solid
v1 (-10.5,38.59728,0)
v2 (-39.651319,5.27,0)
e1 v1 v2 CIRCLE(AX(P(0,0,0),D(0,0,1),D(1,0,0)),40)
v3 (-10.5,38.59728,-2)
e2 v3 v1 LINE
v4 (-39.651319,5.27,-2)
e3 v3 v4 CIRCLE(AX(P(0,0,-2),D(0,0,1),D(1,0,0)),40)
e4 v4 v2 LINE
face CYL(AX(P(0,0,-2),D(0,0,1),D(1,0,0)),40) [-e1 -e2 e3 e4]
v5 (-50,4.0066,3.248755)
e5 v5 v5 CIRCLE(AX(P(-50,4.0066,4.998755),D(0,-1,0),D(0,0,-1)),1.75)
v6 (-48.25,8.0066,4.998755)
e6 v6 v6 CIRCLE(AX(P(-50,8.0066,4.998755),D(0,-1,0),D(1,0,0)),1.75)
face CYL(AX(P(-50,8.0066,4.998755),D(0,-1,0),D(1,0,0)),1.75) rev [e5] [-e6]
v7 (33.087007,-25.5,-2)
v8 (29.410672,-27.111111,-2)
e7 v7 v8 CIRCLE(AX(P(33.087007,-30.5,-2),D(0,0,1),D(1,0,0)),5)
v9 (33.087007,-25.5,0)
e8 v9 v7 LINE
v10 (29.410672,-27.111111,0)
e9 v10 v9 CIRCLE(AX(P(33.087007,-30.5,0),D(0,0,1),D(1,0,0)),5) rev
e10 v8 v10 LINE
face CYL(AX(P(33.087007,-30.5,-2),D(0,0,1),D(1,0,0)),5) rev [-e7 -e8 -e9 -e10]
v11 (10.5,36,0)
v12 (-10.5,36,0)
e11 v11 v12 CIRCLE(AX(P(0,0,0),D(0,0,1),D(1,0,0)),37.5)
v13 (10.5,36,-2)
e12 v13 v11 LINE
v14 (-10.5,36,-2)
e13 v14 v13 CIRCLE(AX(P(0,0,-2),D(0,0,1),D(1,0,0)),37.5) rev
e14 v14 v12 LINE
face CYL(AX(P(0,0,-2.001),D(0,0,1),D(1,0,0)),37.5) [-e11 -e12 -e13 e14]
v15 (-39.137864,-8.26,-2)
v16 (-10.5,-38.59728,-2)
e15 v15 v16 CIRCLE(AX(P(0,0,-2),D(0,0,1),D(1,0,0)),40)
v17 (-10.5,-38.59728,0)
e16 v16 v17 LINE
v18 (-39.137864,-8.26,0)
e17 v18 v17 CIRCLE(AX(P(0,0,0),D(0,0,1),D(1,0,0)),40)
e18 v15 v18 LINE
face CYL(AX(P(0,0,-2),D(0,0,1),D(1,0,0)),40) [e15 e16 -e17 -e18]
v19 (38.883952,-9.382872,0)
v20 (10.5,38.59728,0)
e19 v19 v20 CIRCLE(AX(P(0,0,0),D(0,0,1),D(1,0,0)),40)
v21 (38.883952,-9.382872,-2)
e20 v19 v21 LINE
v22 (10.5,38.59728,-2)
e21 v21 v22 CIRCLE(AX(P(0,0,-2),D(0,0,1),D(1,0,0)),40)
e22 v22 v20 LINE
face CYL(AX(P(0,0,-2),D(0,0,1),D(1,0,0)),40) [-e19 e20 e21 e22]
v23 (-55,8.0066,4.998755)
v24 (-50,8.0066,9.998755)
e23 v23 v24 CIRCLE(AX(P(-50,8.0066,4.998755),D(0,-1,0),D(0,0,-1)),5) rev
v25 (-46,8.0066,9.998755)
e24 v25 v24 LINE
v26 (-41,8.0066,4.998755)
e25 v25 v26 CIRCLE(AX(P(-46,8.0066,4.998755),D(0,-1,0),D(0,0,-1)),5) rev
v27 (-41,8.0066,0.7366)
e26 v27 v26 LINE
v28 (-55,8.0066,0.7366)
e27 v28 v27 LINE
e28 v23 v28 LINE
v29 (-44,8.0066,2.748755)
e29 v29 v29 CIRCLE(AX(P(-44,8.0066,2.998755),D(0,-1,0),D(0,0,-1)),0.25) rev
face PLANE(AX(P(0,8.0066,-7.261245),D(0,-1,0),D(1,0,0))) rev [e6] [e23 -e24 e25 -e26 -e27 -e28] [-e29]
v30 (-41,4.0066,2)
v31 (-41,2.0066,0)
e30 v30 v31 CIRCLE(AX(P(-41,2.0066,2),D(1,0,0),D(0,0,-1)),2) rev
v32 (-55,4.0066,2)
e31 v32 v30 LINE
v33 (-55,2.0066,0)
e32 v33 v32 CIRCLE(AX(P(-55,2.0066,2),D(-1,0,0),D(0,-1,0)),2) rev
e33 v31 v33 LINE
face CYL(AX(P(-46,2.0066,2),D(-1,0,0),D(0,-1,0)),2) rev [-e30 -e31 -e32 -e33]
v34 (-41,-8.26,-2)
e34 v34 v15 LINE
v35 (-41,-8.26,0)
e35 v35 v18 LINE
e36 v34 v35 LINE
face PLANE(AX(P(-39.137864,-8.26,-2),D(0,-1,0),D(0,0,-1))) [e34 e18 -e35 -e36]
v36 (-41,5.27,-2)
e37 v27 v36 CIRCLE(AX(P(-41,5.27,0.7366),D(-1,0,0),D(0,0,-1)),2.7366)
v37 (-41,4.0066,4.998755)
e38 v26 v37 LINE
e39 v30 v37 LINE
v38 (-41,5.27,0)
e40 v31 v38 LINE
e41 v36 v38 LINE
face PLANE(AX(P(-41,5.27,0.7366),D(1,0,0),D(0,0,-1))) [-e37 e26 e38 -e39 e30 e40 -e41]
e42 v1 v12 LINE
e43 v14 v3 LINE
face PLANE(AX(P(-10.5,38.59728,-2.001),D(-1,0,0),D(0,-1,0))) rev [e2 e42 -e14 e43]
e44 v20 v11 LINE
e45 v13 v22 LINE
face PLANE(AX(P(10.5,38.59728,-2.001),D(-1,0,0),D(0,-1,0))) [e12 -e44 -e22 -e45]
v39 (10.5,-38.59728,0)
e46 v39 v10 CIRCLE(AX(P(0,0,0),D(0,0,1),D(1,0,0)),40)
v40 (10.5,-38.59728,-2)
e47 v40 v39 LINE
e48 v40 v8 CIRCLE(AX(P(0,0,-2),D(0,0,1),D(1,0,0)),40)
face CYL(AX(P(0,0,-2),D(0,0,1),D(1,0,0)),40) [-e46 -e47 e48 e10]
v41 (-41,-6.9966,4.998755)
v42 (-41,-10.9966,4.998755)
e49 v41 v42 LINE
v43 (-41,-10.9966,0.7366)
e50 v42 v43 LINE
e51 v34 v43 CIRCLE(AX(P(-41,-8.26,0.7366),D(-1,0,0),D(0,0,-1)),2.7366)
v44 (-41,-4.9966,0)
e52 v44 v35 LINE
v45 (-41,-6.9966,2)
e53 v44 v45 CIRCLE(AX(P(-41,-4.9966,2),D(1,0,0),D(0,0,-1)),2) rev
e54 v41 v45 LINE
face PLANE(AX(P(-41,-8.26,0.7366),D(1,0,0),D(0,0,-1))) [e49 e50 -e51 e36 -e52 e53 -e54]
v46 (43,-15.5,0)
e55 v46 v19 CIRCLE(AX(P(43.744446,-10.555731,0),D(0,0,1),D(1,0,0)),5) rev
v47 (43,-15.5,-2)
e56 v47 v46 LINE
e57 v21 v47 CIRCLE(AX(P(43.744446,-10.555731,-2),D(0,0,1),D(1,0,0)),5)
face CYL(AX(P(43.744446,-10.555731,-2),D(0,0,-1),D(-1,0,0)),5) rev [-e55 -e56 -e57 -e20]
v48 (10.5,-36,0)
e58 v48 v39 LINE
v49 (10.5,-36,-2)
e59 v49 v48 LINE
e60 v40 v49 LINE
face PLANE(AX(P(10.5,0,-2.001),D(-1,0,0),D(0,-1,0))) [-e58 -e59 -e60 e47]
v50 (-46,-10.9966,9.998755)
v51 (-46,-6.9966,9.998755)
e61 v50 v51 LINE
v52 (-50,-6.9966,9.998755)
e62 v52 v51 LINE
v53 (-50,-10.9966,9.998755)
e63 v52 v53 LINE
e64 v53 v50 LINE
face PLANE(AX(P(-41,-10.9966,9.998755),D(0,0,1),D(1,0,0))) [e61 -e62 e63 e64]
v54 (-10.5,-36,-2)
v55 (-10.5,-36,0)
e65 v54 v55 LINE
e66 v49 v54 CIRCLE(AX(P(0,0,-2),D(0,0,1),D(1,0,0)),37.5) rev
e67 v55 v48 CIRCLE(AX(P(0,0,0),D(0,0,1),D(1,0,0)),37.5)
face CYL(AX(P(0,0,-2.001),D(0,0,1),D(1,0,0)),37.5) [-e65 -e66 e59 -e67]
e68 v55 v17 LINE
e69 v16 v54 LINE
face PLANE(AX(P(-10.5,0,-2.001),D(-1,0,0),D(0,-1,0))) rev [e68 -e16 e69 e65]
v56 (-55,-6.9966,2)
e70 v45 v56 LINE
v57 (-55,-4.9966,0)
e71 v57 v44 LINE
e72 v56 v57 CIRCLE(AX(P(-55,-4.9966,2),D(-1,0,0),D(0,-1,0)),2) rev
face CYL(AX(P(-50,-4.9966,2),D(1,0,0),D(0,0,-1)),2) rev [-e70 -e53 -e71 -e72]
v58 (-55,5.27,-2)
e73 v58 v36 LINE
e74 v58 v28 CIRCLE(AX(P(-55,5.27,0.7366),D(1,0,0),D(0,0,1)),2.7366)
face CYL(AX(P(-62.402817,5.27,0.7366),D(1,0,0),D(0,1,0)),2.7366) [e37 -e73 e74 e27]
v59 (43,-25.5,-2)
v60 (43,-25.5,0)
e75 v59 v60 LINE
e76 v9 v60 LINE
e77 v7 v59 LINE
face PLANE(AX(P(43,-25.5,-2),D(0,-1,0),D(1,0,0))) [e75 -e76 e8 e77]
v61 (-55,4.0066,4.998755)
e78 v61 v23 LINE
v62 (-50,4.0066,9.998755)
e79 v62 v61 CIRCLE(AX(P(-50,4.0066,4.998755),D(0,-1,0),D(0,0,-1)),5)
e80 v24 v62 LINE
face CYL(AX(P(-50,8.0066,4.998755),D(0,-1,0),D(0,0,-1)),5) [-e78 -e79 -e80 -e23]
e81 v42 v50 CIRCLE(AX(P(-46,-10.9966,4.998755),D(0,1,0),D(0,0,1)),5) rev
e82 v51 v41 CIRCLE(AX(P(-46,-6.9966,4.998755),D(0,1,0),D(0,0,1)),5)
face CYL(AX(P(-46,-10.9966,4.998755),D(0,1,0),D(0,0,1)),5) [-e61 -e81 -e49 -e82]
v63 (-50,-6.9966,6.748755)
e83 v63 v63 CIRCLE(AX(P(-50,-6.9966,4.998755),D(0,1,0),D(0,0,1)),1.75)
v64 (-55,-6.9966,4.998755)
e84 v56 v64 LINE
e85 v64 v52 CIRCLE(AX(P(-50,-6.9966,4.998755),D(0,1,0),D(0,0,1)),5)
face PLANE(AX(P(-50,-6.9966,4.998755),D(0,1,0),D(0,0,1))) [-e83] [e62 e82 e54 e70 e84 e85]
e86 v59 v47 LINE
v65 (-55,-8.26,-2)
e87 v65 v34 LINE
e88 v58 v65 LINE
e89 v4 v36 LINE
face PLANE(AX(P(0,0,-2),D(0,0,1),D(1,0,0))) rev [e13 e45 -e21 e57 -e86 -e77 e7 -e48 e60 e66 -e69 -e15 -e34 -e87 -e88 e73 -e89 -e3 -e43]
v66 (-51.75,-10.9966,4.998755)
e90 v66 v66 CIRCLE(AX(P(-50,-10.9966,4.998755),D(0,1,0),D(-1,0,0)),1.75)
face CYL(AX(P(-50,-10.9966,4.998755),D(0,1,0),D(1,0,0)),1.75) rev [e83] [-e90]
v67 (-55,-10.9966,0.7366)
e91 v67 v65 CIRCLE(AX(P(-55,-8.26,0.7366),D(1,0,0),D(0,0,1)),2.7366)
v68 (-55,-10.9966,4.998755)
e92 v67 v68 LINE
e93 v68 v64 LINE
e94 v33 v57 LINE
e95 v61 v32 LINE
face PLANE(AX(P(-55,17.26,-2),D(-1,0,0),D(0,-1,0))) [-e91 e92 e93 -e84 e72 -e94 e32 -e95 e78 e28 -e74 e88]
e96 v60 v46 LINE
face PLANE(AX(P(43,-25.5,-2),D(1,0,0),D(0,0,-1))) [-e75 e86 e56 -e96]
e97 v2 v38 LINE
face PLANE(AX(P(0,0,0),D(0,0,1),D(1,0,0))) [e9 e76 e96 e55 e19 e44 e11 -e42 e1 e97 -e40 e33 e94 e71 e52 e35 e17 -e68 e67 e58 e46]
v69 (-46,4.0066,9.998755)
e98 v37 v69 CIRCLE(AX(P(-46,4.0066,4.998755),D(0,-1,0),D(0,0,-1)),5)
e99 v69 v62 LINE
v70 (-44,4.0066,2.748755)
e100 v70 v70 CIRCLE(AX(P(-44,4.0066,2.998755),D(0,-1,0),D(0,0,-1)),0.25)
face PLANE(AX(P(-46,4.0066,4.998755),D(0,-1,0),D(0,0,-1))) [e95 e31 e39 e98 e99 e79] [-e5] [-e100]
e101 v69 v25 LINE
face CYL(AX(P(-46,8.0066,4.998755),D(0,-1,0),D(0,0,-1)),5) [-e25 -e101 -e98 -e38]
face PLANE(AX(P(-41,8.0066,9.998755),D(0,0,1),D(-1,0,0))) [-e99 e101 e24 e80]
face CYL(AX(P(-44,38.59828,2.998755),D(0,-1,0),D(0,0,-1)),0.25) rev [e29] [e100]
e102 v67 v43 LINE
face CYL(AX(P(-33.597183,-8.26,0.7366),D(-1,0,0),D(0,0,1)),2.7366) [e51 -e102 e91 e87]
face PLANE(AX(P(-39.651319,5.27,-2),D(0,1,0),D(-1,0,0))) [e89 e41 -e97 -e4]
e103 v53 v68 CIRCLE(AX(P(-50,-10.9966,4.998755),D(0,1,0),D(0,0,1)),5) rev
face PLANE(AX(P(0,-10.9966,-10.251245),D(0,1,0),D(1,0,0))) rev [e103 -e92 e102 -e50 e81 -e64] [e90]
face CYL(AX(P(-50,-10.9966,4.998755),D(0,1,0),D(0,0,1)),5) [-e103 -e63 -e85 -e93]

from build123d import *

# Parameters (mm, degrees)
SKETCH1_R                  = 1.7500000000000038
SKETCH1_R_2                = 1.7500000000000033
BASE_FLANGE1_DEPTH         = 2
SKETCHED_START             = -55
SKETCHED_BEND1_DEPTH       = 14
SKETCHED_START_2           = -48.2499999
SKETCHED_BEND1_2_DEPTH     = 7.2499999
SKETCHED_BEND1_3_DEPTH     = 3.2499999
SKETCHED_START_3           = -51.7500001
SKETCHED_BEND1_4_DEPTH     = 3.5000002
SKETCHED_START_4           = -10.9966
SKETCHED_BEND1_5_OUTLINE_R = 1.75
SKETCHED_BEND1_5_DEPTH     = 19.0032
FILLET1_R                  = 5
CUT_EXTRUDE2_REACH         = 70.738
FILLET2_R                  = 5
BOSS_EXTRUDE1_START        = 2
SKETCH9_R                  = 1.7500000000000036
BOSS_EXTRUDE1_DEPTH        = 2
CUT_EXTRUDE1_REACH         = 72.286
SKETCH7_R                  = 0.24999999999999958
SKETCH10_R                 = 1.7500000000000036
BOSS_EXTRUDE2_DEPTH        = 2
FILLET3_R                  = 2


with BuildPart() as part:
    # Base-Flange1: sheet metal written as solids
    # Sketch1 → Base-Flange1 (new body)
    with BuildSketch(Plane.XY):
        with BuildLine():
            Line((-39.65131901967449, 5.269999999999999), (-40.999999999999986, 5.270000000000006))
            Line((-40.999999999999986, 5.270000000000006), (-40.999999999999986, 17.26000000000001))
            Line((-40.999999999999986, 17.26000000000001), (-54.999999999999986, 17.260000000000012))
            Line((-54.999999999999986, 17.260000000000012), (-54.99999999999998, -20.25))
            Line((-54.99999999999998, -20.25), (-40.99999999999998, -20.250000000000004))
            Line((-40.99999999999998, -20.250000000000004), (-40.999999999999986, -8.26))
            Line((-40.999999999999986, -8.26), (-39.13786401938665, -8.26))
            ThreePointArc((-39.13786401938665, -8.26), (-9.571278660785763, -38.83800490238379), (30.81801421246995, -25.500000000000004))
            Line((30.81801421246995, -25.500000000000004), (43, -25.5))
            Line((43, -25.5), (43, -15.499999999999998))
            Line((43, -15.499999999999998), (36.874788134984584, -15.499999999999996))
            ThreePointArc((36.874788134984584, -15.499999999999996), (10.47738068118216, 38.60342593684647), (-39.65131901967449, 5.269999999999999))
        make_face()
        with Locations((-50, 12.260000000000014)):
            Circle(SKETCH1_R, mode=Mode.SUBTRACT)
        with Locations(Location((-49.999999999999986, -15.250000000000002, 0), (0, 0, 180))):
            Circle(SKETCH1_R_2, mode=Mode.SUBTRACT)
    extrude(amount=-BASE_FLANGE1_DEPTH)

    # Sketched Bend1: read off the stored shape, not the designer's step
    # Sketched Bend1 outline → Sketched Bend1 (cut)
    with BuildSketch(Plane.YZ.offset(SKETCHED_START)):
        with BuildLine():
            Line((-20.25, -2), (-8.26, -2))
            ThreePointArc((-8.26, -2), (-9.914267209, -1.443395312), (-10.895602398, 0))
            Line((-10.895602398, 0), (-20.25, 0))
            Line((-20.25, 0), (-20.25, -2))
        make_face()
        with BuildLine():
            ThreePointArc((7.905602398, 0), (6.924267209, -1.443395312), (5.27, -2))
            Line((5.27, -2), (17.26, -2))
            Line((17.26, -2), (17.26, 0))
            Line((17.26, 0), (7.905602398, 0))
        make_face()
    extrude(amount=SKETCHED_BEND1_DEPTH, mode=Mode.SUBTRACT)

    # Sketched Bend1 2 outline → Sketched Bend1 2 (add)
    with BuildSketch(Plane.YZ.offset(SKETCHED_START_2)):
        with BuildLine():
            ThreePointArc((-10.9966, 0.7366), (-10.971233029, 0.364854094), (-10.895602398, 0))
            Line((-10.895602398, 0), (-8.26, 0))
            ThreePointArc((-8.26, 0), (-8.780854855, 0.215745145), (-8.9966, 0.7366))
            Line((-8.9966, 0.7366), (-8.9966, 9.998755099))
            Line((-8.9966, 9.998755099), (-10.9966, 9.998755099))
            Line((-10.9966, 9.998755099), (-10.9966, 0.7366))
        make_face()
        with BuildLine():
            Line((5.27, 0), (7.905602398, 0))
            ThreePointArc((7.905602398, 0), (7.981233029, 0.364854094), (8.0066, 0.7366))
            Line((8.0066, 0.7366), (8.0066, 9.998755099))
            Line((8.0066, 9.998755099), (6.0066, 9.998755099))
            Line((6.0066, 9.998755099), (6.0066, 0.7366))
            ThreePointArc((6.0066, 0.7366), (5.790854855, 0.215745145), (5.27, 0))
        make_face()
    extrude(amount=SKETCHED_BEND1_2_DEPTH)

    # Sketched Bend1 3 outline → Sketched Bend1 3 (add)
    with BuildSketch(Plane.YZ.offset(SKETCHED_START)):
        with BuildLine():
            ThreePointArc((-10.9966, 0.7366), (-10.971233029, 0.364854094), (-10.895602398, 0))
            Line((-10.895602398, 0), (-8.26, 0))
            ThreePointArc((-8.26, 0), (-8.780854855, 0.215745145), (-8.9966, 0.7366))
            Line((-8.9966, 0.7366), (-8.9966, 9.998755099))
            Line((-8.9966, 9.998755099), (-10.9966, 9.998755099))
            Line((-10.9966, 9.998755099), (-10.9966, 0.7366))
        make_face()
        with BuildLine():
            Line((5.27, 0), (7.905602398, 0))
            ThreePointArc((7.905602398, 0), (7.981233029, 0.364854094), (8.0066, 0.7366))
            Line((8.0066, 0.7366), (8.0066, 9.998755099))
            Line((8.0066, 9.998755099), (6.0066, 9.998755099))
            Line((6.0066, 9.998755099), (6.0066, 0.7366))
            ThreePointArc((6.0066, 0.7366), (5.790854855, 0.215745145), (5.27, 0))
        make_face()
    extrude(amount=SKETCHED_BEND1_3_DEPTH)

    # Sketched Bend1 4 outline → Sketched Bend1 4 (add)
    with BuildSketch(Plane.YZ.offset(SKETCHED_START_3)):
        with BuildLine():
            ThreePointArc((6.0066, 0.7366), (5.790854855, 0.215745145), (5.27, 0))
            Line((5.27, 0), (7.905602398, 0))
            ThreePointArc((7.905602398, 0), (7.981233029, 0.364854094), (8.0066, 0.7366))
            Line((8.0066, 0.7366), (8.0066, 9.998755099))
            Line((8.0066, 9.998755099), (6.0066, 9.998755099))
            Line((6.0066, 9.998755099), (6.0066, 0.7366))
        make_face()
        with BuildLine():
            ThreePointArc((-10.9966, 0.7366), (-10.971233029, 0.364854094), (-10.895602398, 0))
            Line((-10.895602398, 0), (-8.26, 0))
            ThreePointArc((-8.26, 0), (-8.780854855, 0.215745145), (-8.9966, 0.7366))
            Line((-8.9966, 0.7366), (-8.9966, 9.998755099))
            Line((-8.9966, 9.998755099), (-10.9966, 9.998755099))
            Line((-10.9966, 9.998755099), (-10.9966, 0.7366))
        make_face()
    extrude(amount=SKETCHED_BEND1_4_DEPTH)

    # Sketched Bend1 5 outline → Sketched Bend1 5 (cut)
    with BuildSketch(Plane(origin=(0, 0, 0), x_dir=(1, 0, 0), z_dir=(0, 1, 0)).offset(SKETCHED_START_4)):
        with Locations((-50, -4.998755099)):
            Circle(SKETCHED_BEND1_5_OUTLINE_R)
    extrude(amount=SKETCHED_BEND1_5_DEPTH, mode=Mode.SUBTRACT)

    # Fillet1
    # the kernel refuses this fillet: 5 mm, written as the material it adds along each edge
    with BuildSketch(Plane(origin=(30.818014212469954, -25.500000000000007, 0), x_dir=(-0.6578741358493351, -0.7531278917823256, 0), z_dir=(0, 0, -1))) as fillet1_piece_1:
        with BuildLine():
            CenterArc((2.272928109865178, -4.998212067114161), FILLET1_R, 91.53229073869478, 47.329766128742406)
            Line((-1.49271134904645, -1.7088413878674857), (-1.5680241382246838, -1.6430539742825514))
            Line((-1.5680241382246838, -1.6430539742825514), (-0.07531278917823364, 0.06578741358493444))
            Line((-0.07531278917823364, 0.06578741358493444), (0.00267403307043032, 0.09996424134228217))
            ThreePointArc((0.00267403307043032, 0.09996424134228217), (1.0696132281718547, 0.0856965369132901), (2.1365524232732724, 0.0999642413422845))
            Line((2.1365524232732724, 0.0999642413422845), (2.139226456343701, -1e-16))
        make_face()
    extrude(amount=2)
    with BuildSketch(Plane(origin=(36.874788134984584, -15.499999999999996, 0), x_dir=(0.3120481831654017, 0.9500662773634121, 0), z_dir=(0, 0, -1))) as fillet1_piece_2:
        with BuildLine():
            CenterArc((6.841047896129056, 4.983779941379127), FILLET1_R, 170.3798521279212, 95.00382355421686)
            Line((1.911361233981272, 5.8193572346573905), (1.8127675007383173, 5.836068780522958))
            ThreePointArc((1.8127675007383173, 5.836068780522958), (0.8606739892542704, 2.9408834356452394), (-0.09500662773634087, 0.03120481831654006))
            Line((-0.09500662773634087, 0.03120481831654006), (0.00804829164250585, -0.09967559882757966))
            ThreePointArc((0.00804829164250585, -0.09967559882757966), (3.219316657001906, 0.02976046896695109), (6.430585022361307, -0.09967559882758435))
            Line((6.430585022361307, -0.09967559882758435), (6.438633314003813, 2.9e-16))
        make_face()
    extrude(amount=2)

    # Sketch8 → Cut-Extrude2 (cut, up to next)
    with BuildSketch(Plane.XY, mode=Mode.PRIVATE) as cut_extrude2_sk1:
        with BuildLine():
            Line((10.500000000000004, -38.59727969689056), (10.50000000000001, -36))
            ThreePointArc((10.500000000000012, -36), (4.4e-16, -37.5), (-10.50000000000001, -36))
            Line((-10.50000000000001, -36), (-10.499999999999996, -38.59727969689056))
            ThreePointArc((-10.499999999999998, -38.59727969689057), (2.22e-15, -40.00000000000001), (10.499999999999998, -38.59727969689057))
        make_face()
    cut_extrude2_tool1 = extrude(cut_extrude2_sk1.sketch, amount=-CUT_EXTRUDE2_REACH, mode=Mode.PRIVATE) & part.part
    # Sketch8 → Cut-Extrude2 (cut, up to next)
    with BuildSketch(Plane.XY, mode=Mode.PRIVATE) as cut_extrude2_sk2:
        with BuildLine():
            ThreePointArc((10.5, 35.99999999999999), (2.3e-15, 37.49999999999999), (-10.5, 35.99999999999999))
            Line((-10.5, 35.99999999999999), (-10.500000000000004, 38.59727969689055))
            ThreePointArc((-10.500000000000004, 38.59727969689055), (2.45e-15, 39.99999999999999), (10.499999999999996, 38.59727969689055))
            Line((10.499999999999996, 38.59727969689055), (10.5, 35.99999999999999))
        make_face()
    cut_extrude2_tool2 = extrude(cut_extrude2_sk2.sketch, amount=-CUT_EXTRUDE2_REACH, mode=Mode.PRIVATE) & part.part
    add(cut_extrude2_tool1.solids().sort_by_distance((0, -38.265011, 0))[0], mode=Mode.SUBTRACT)
    add(cut_extrude2_tool2.solids().sort_by_distance((0, 38.265011, 0))[0], mode=Mode.SUBTRACT)

    # Fillet2
    fillet2_edges = [part.edges().sort_by_distance(p)[0] for p in [
        (-55, 7.006600000000001, 9.998755099),
        (-41, 7.006600000000001, 9.998755099),
        (-41, -9.9966, 9.998755099),
        (-55, -9.9966, 9.998755099),
    ]]
    fillet(fillet2_edges, radius=FILLET2_R)

    # Sketch9 → Boss-Extrude1 (add)
    with BuildSketch(Plane.XZ.offset(-6.006600000000028).offset(BOSS_EXTRUDE1_START)):
        with BuildLine():
            Line((-54.999999999999986, 0.7365999999999726), (-54.999999999999986, -1.843e-14))
            Line((-54.999999999999986, -1.843e-14), (-40.999999999999986, -1.843e-14))
            Line((-40.999999999999986, -1.843e-14), (-40.999999999999986, 0.7365999999999743))
            Line((-40.999999999999986, 0.7365999999999743), (-40.999999999999986, 4.998755098887944))
            ThreePointArc((-40.999999999999986, 4.998755098887944), (-42.46446609406725, 8.534289004820682), (-45.999999999999986, 9.998755098887946))
            Line((-45.999999999999986, 9.998755098887946), (-49.999999999999986, 9.998755098887948))
            ThreePointArc((-49.999999999999986, 9.998755098887948), (-53.53553390593273, 8.53428900482069), (-54.999999999999986, 4.99875509888795))
            Line((-54.999999999999986, 4.99875509888795), (-54.999999999999986, 0.7365999999999726))
        make_face()
        with Locations(Location((-50, 4.998755098887954, 0), (0, 0, 180))):
            Circle(SKETCH9_R, mode=Mode.SUBTRACT)
    extrude(amount=-BOSS_EXTRUDE1_DEPTH)

    # Sketch7 → Cut-Extrude1 (cut, up to next)
    with BuildSketch(Plane.XZ.offset(-4.006600000000027), mode=Mode.PRIVATE) as cut_extrude1_sk1:
        with Locations(Location((-44.00000000000001, 2.998755098887952, 0), (0, 0, 270))):
            Circle(SKETCH7_R)
    cut_extrude1_tool1 = extrude(cut_extrude1_sk1.sketch, amount=-CUT_EXTRUDE1_REACH, mode=Mode.PRIVATE) & part.part
    add(cut_extrude1_tool1.solids().sort_by_distance((-44, 4.0066, 2.998755))[0], mode=Mode.SUBTRACT)

    # Sketch10 → Boss-Extrude2 (add)
    with BuildSketch(Plane(origin=(0, -8.996599999999987, 3.141e-14), x_dir=(1, 0, 0), z_dir=(0, 1, -3.49e-15))):
        with BuildLine():
            Line((-54.99999999999998, 2.884e-14), (-54.99999999999998, -0.7365999999999777))
            Line((-54.99999999999998, -0.7365999999999777), (-54.99999999999998, -4.99875509888795))
            ThreePointArc((-54.99999999999998, -4.99875509888795), (-53.535533905932716, -8.534289004820696), (-49.99999999999997, -9.998755098887964))
            Line((-49.99999999999997, -9.998755098887964), (-45.99999999999998, -9.998755098887965))
            ThreePointArc((-45.99999999999998, -9.998755098887965), (-42.46446609406724, -8.534289004820701), (-40.99999999999998, -4.998755098887962))
            Line((-40.99999999999998, -4.998755098887962), (-40.999999999999986, -0.7365999999999864))
            Line((-40.999999999999986, -0.7365999999999864), (-40.999999999999986, 2.884e-14))
            Line((-40.999999999999986, 2.884e-14), (-54.99999999999998, 2.884e-14))
        make_face()
        with Locations(Location((-49.999999999999986, -4.9987550988879645, 0), (0, 0, 270))):
            Circle(SKETCH10_R, mode=Mode.SUBTRACT)
    extrude(amount=BOSS_EXTRUDE2_DEPTH)

    # Fillet3
    fillet3_edges = [part.edges().sort_by_distance(p)[0] for p in [
        (-47.999999999999986, 4.006600000000022, -4.44e-15),
        (-47.999999999999986, -6.996599999999987, -4.41e-15),
    ]]
    fillet(fillet3_edges, radius=FILLET3_R)


solid = part.part
